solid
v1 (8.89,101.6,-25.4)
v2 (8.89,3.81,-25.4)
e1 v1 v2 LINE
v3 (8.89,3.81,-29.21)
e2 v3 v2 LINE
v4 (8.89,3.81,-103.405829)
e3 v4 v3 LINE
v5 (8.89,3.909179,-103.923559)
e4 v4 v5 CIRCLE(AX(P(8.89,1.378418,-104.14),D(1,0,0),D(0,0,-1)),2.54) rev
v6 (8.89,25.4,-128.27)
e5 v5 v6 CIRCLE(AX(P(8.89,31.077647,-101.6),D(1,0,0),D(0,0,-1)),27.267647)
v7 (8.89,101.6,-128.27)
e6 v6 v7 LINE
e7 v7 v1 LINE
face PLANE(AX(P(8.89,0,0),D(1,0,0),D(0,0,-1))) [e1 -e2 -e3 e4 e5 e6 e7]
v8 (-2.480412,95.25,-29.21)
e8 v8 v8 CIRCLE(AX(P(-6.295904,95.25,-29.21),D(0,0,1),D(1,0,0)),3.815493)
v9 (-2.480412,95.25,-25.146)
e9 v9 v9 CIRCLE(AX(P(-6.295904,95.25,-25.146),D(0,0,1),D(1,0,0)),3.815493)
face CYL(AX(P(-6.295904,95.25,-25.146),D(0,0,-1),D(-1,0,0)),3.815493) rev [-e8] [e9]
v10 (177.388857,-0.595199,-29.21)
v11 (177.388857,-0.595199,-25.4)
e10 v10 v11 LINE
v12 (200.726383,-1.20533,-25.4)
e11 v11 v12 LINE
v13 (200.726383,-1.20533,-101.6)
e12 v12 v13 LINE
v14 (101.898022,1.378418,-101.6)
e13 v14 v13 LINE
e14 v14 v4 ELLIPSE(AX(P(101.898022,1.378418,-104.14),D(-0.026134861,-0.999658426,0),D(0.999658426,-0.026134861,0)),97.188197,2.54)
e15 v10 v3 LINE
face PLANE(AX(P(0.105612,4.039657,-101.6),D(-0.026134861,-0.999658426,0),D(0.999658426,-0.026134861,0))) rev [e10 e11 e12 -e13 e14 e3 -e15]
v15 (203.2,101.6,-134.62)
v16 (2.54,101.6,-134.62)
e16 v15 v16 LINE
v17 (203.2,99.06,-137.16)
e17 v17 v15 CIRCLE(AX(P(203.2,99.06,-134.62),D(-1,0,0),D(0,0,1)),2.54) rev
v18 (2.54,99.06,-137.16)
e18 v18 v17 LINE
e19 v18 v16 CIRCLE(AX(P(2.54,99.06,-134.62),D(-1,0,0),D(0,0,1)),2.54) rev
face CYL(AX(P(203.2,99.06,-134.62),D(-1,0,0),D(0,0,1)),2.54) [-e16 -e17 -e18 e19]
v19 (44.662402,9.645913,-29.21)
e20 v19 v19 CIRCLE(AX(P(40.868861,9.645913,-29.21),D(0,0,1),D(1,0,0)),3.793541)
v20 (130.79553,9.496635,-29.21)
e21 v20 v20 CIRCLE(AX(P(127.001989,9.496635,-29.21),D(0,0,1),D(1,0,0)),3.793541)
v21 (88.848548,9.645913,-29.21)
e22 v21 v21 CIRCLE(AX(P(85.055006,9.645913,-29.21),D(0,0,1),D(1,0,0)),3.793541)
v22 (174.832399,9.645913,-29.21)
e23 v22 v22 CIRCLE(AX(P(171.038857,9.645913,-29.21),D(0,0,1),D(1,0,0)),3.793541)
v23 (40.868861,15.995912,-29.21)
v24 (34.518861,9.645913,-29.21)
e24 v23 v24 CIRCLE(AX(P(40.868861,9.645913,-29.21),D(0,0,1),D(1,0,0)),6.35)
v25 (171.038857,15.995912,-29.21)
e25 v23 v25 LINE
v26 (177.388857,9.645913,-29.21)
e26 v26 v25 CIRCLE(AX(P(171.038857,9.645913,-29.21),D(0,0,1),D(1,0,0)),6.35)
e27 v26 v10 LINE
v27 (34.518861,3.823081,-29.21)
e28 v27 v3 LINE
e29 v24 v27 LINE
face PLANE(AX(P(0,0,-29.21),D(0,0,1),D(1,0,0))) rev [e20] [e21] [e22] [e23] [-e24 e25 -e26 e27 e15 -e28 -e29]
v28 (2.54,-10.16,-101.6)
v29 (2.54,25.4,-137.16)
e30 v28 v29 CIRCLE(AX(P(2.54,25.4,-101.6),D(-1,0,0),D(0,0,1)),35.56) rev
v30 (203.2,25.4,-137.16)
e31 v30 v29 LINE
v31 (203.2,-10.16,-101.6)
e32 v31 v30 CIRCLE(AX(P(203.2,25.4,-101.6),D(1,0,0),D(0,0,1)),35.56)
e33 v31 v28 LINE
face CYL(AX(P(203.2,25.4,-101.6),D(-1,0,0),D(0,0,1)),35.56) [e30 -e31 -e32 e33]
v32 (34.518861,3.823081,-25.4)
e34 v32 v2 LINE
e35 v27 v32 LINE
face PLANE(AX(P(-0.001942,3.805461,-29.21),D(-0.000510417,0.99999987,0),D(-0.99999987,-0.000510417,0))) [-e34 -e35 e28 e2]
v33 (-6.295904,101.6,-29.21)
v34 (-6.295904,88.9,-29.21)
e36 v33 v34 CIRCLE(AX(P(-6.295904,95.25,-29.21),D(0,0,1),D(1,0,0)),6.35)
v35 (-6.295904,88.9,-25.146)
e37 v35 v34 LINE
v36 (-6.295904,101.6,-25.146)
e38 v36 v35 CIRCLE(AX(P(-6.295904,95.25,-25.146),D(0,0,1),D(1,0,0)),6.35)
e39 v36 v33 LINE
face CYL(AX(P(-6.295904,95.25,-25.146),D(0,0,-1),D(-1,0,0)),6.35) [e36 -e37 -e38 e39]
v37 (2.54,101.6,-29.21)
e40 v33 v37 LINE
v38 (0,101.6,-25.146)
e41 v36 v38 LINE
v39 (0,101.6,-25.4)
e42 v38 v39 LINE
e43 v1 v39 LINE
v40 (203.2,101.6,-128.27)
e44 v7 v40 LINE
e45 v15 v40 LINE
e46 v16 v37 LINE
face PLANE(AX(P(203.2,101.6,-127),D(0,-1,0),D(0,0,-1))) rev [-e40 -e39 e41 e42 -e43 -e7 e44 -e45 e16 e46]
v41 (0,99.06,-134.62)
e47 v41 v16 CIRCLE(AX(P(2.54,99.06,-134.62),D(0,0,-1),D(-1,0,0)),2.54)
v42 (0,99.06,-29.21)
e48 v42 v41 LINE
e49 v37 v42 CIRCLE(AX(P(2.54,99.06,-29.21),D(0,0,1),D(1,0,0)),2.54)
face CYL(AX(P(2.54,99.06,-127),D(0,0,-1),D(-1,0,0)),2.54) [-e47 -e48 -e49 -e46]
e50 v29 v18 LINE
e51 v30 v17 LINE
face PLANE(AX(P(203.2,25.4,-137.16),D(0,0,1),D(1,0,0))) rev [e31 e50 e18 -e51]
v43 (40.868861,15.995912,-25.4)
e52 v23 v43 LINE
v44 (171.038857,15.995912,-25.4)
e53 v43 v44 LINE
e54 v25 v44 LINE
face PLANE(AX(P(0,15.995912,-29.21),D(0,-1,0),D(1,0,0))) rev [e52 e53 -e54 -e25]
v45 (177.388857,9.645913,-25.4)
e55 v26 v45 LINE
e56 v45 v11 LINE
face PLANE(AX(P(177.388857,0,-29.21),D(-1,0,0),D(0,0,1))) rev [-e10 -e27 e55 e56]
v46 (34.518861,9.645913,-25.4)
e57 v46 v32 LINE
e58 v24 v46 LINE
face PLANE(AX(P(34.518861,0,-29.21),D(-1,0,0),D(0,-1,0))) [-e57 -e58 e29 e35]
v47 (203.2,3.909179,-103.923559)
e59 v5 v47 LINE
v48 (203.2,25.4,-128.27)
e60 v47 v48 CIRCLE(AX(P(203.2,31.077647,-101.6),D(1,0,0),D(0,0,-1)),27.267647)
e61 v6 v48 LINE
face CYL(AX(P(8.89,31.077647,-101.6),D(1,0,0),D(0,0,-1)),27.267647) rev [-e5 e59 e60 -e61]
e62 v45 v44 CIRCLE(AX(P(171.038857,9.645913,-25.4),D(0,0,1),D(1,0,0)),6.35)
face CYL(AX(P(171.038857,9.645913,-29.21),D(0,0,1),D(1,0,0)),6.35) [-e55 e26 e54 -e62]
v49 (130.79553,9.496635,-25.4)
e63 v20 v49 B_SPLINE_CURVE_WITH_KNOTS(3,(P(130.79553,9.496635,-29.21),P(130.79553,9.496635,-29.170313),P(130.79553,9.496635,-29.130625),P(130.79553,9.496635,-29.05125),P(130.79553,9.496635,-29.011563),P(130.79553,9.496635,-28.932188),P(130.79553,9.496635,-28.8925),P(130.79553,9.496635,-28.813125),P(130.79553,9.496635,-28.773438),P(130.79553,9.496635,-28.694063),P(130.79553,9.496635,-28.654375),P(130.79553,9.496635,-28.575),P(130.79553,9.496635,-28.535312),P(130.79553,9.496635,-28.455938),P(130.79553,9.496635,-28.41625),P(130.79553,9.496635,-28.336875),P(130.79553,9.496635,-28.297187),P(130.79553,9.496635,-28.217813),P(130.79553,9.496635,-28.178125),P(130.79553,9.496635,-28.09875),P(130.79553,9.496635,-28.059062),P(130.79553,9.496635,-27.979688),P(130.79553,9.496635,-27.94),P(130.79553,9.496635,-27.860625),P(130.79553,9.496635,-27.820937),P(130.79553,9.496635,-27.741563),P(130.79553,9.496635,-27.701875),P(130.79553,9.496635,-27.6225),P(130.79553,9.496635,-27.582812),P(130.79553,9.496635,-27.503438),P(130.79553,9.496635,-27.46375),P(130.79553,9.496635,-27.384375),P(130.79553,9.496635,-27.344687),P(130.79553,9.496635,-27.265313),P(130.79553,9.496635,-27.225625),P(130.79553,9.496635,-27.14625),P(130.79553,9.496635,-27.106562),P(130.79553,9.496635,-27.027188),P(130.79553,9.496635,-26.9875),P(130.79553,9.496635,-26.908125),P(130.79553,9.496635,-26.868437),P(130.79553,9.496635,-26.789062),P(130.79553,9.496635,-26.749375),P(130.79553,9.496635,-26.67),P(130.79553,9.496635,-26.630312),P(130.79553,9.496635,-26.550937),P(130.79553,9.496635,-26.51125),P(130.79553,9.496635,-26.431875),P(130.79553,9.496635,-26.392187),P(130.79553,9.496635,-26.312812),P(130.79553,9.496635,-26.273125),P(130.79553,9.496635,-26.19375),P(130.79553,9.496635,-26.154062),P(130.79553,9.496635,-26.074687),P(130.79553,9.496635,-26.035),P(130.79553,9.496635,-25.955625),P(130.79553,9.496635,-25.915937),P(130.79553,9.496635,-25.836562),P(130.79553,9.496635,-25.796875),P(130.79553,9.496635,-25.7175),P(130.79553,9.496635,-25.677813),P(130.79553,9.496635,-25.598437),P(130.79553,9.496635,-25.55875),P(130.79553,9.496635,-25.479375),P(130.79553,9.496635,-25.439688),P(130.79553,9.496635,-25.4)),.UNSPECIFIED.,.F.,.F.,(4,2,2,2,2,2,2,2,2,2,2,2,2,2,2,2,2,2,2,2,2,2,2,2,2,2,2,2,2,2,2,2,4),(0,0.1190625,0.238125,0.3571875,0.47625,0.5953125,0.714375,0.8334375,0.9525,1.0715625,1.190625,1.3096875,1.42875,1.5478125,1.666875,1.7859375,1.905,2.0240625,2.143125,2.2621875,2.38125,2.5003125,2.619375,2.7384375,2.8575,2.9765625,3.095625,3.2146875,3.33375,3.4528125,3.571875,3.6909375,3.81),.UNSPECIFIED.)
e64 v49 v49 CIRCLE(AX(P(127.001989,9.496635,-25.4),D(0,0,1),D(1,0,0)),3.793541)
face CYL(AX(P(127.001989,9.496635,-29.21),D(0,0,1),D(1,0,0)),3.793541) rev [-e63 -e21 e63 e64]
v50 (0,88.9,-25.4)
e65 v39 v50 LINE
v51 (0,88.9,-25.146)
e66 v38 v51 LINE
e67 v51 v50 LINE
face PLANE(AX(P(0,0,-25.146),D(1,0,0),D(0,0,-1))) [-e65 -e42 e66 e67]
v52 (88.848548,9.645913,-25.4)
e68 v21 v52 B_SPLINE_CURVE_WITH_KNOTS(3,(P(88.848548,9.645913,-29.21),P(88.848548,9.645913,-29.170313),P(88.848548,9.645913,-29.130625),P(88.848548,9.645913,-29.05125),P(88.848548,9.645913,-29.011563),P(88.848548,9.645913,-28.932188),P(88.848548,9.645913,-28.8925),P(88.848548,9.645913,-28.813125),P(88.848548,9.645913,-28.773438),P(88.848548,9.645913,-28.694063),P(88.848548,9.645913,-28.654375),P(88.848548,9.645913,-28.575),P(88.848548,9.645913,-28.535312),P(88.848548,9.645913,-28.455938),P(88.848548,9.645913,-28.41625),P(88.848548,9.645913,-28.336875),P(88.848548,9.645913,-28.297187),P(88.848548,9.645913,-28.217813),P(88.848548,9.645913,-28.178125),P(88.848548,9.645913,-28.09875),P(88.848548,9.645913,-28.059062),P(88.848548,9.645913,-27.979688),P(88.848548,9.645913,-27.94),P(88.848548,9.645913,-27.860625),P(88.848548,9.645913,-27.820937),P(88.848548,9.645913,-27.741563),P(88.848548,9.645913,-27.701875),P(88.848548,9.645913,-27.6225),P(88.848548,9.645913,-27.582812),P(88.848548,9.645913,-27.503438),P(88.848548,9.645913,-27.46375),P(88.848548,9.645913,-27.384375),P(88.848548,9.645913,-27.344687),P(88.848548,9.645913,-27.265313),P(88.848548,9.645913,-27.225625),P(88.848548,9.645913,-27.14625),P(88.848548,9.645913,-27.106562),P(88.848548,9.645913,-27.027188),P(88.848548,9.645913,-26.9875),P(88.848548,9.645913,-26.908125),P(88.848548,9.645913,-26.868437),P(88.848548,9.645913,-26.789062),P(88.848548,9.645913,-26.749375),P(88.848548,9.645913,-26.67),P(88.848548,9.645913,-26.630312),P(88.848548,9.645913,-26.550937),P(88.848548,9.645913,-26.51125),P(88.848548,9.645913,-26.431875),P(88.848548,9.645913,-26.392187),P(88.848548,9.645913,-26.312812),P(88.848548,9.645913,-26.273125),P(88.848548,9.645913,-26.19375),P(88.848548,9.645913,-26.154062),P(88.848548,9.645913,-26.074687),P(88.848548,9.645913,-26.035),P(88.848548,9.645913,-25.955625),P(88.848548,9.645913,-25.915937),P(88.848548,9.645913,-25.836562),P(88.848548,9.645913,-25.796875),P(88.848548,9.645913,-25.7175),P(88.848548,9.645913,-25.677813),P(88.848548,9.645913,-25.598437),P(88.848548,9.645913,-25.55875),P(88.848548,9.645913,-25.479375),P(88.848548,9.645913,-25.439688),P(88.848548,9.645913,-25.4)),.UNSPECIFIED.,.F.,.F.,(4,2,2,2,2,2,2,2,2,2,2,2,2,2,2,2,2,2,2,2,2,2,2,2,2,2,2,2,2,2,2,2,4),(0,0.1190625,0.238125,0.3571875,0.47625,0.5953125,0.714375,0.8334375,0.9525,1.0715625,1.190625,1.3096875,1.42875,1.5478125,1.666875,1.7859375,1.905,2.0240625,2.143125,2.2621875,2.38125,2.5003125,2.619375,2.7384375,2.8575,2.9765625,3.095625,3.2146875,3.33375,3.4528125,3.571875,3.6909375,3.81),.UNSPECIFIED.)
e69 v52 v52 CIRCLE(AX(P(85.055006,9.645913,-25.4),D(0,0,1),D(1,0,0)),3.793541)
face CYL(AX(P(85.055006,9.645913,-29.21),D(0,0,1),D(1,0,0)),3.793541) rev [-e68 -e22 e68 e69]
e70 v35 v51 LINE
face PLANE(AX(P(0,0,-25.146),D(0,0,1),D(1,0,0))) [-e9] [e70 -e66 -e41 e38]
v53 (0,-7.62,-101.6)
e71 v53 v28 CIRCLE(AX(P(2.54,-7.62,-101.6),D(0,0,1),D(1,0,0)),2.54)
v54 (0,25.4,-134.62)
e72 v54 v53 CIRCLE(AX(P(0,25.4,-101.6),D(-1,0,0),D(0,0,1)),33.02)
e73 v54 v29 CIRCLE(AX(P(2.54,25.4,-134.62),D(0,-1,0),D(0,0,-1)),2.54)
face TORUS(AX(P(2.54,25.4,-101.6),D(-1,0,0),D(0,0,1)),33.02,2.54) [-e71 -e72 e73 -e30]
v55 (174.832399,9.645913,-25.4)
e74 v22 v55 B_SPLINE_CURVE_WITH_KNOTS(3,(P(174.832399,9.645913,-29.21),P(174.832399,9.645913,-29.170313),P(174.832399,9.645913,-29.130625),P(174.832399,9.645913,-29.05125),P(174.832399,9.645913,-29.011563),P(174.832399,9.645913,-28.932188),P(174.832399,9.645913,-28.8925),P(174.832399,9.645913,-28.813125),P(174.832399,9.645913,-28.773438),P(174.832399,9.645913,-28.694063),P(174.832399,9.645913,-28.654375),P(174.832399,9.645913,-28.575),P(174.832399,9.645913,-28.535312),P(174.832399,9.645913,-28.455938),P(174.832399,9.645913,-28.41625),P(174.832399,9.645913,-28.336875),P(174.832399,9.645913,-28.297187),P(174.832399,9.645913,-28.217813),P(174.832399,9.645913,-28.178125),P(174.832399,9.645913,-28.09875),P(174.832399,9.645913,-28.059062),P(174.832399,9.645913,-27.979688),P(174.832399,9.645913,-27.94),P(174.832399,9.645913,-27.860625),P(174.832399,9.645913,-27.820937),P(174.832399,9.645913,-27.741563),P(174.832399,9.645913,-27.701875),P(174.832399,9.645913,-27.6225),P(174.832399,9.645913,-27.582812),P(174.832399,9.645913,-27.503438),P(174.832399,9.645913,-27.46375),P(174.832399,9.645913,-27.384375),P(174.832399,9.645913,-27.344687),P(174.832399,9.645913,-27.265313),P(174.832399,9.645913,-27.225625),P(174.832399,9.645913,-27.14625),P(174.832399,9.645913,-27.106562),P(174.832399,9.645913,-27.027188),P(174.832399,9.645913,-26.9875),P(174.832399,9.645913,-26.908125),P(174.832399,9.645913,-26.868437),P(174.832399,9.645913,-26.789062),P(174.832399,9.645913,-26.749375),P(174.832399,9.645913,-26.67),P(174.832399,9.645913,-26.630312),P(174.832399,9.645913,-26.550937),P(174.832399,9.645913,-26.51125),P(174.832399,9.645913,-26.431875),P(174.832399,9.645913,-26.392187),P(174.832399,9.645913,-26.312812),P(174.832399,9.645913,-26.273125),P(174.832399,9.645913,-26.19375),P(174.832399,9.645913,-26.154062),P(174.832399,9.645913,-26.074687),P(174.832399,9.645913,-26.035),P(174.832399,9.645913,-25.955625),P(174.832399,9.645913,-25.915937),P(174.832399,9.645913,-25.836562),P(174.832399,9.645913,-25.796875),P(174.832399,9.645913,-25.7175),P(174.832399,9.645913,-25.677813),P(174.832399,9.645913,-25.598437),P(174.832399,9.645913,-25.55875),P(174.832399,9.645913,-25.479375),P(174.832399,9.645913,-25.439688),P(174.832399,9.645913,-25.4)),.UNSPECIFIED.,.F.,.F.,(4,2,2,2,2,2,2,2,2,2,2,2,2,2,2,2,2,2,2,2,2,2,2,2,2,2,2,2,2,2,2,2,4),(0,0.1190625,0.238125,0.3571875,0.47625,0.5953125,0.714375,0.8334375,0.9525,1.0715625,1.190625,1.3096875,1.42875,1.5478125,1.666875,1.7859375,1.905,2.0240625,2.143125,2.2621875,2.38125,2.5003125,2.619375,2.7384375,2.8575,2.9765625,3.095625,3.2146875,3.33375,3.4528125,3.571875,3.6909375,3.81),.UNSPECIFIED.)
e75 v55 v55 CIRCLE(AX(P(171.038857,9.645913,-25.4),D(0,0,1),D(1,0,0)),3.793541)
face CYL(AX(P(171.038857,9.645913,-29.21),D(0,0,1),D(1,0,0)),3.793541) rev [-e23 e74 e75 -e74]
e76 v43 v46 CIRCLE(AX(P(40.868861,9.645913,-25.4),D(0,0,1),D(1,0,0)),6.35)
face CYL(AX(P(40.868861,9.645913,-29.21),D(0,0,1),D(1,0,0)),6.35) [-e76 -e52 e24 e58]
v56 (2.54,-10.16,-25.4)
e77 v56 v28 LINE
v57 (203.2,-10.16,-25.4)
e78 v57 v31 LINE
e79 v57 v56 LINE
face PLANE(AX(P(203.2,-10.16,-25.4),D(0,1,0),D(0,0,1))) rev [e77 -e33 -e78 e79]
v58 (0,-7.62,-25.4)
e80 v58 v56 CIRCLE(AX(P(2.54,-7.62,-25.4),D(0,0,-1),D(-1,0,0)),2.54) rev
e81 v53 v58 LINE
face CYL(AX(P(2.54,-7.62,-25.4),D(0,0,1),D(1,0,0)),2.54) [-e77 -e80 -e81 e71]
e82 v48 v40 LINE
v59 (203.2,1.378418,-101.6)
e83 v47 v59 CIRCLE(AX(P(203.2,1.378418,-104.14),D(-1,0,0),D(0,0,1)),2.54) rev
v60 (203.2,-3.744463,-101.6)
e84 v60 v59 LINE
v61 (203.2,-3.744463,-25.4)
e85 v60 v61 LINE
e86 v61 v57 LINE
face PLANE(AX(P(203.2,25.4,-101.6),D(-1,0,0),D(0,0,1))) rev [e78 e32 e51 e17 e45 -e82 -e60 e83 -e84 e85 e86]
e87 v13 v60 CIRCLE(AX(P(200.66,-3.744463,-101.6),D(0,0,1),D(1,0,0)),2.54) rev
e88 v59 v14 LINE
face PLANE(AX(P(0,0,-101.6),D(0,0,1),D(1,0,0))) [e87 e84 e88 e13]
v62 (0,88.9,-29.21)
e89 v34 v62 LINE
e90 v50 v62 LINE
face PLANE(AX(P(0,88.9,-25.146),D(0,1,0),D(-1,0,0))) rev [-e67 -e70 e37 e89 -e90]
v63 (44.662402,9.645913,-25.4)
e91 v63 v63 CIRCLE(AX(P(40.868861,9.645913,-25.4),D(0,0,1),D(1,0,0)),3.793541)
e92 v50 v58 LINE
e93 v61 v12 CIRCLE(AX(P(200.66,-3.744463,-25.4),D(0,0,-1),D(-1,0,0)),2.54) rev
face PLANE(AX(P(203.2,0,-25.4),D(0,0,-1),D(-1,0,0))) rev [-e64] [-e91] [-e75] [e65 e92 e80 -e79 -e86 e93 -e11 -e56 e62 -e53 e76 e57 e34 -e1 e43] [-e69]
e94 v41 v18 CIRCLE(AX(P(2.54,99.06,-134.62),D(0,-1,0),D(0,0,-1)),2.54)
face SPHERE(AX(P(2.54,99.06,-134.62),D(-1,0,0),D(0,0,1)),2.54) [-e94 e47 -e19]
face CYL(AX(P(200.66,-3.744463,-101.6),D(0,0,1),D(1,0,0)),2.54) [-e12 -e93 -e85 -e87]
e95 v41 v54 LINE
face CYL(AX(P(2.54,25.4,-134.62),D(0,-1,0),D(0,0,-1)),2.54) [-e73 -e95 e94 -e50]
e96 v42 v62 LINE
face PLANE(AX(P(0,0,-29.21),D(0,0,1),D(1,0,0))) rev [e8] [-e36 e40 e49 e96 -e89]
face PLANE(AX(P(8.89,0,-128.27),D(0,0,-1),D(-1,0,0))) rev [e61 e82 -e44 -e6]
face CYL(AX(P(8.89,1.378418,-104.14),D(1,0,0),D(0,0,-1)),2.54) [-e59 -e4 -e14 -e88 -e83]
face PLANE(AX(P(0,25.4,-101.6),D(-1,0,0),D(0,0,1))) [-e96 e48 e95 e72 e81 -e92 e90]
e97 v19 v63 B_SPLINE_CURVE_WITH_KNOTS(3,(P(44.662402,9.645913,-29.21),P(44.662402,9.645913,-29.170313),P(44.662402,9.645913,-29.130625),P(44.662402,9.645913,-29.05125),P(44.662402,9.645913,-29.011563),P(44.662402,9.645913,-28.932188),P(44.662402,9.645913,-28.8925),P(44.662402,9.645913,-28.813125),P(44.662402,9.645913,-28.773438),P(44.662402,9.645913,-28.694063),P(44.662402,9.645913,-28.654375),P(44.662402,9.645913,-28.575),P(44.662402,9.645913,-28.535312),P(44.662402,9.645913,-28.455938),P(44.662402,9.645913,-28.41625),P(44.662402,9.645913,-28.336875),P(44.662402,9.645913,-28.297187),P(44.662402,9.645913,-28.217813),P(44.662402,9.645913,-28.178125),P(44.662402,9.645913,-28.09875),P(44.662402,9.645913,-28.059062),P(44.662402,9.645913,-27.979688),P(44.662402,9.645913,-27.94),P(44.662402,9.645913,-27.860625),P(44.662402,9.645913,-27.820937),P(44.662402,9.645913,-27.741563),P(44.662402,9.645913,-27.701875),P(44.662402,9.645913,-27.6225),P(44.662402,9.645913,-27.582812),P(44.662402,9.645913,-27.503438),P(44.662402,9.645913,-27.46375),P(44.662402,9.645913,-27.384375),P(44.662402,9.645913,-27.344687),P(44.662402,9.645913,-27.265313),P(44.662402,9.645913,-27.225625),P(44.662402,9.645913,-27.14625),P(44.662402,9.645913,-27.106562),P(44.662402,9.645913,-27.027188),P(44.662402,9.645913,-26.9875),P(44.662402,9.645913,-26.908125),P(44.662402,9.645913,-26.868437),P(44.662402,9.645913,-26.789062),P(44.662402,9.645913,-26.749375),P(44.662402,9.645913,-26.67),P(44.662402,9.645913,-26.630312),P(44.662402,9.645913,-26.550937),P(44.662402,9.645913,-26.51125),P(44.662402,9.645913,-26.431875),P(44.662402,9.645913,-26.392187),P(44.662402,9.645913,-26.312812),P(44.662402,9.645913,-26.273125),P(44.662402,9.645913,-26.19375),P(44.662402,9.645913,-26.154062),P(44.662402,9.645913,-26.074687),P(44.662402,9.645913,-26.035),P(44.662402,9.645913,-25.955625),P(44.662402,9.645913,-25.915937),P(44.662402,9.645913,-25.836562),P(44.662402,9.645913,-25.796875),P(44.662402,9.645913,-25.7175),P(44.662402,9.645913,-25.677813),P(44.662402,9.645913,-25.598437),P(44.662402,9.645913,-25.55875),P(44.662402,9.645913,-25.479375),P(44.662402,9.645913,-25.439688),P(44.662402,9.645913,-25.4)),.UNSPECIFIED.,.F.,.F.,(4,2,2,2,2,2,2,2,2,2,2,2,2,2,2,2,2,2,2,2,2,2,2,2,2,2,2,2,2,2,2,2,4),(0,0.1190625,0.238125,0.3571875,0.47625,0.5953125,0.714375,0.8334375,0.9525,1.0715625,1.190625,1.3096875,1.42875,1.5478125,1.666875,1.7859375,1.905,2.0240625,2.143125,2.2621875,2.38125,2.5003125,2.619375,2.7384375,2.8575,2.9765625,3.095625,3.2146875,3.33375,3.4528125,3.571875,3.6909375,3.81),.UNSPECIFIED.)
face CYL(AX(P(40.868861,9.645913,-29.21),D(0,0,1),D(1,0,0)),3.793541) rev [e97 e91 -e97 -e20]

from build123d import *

# Parameters (mm, degrees)
BOSS_EXTRUDE1_DEPTH      = 203.2
CUT_EXTRUDE1_DEPTH       = 194.31
CUT_EXTRUDE2_DEPTH       = 76.2
FILLET1_R                = 2.54
SKETCH8_R                = 3.793541353
BOSS_EXTRUDE2_DEPTH      = 3.81
BOSS_EXTRUDE3_DEPTH      = 0.254
BOSS_EXTRUDE3_DEPTH_BACK = 3.81
SKETCH9_R                = 3.815492591
FILLET2_R                = 2.54
FILLET4_R                = 2.54
FILLET5_R                = 2.54


with BuildPart() as part:
    # Sketch1 → Boss-Extrude1 (new body)
    with BuildSketch(Plane(origin=(0, 0, 0), x_dir=(0, 0, -1), z_dir=(1, 0, 0))):
        with BuildLine():
            Line((25.4, 0), (25.4, -10.16))
            Line((25.4, -10.16), (101.6, -10.16))
            ThreePointArc((101.6, -10.16), (126.744717139, 0.255282861), (137.16, 25.4))
            Line((137.16, 25.4), (137.16, 101.6))
            Line((137.16, 101.6), (127, 101.6))
            Line((127, 101.6), (25.4, 101.6))
            Line((25.4, 101.6), (25.4, 0))
        make_face()
    extrude(amount=BOSS_EXTRUDE1_DEPTH)

    # Sketch4 → Cut-Extrude1 (cut)
    with BuildSketch(Plane(origin=(203.2, 0, 0), x_dir=(0, 0, -1), z_dir=(1, 0, 0))):
        with BuildLine():
            Line((25.4, 3.81), (101.6, 3.81))
            ThreePointArc((101.6, 3.81), (118.756755229, 9.884008246), (128.27, 25.4))
            Line((128.27, 25.4), (128.27, 101.6))
            Line((128.27, 101.6), (25.4, 101.6))
            Line((25.4, 101.6), (25.4, 3.81))
        make_face()
    extrude(amount=-CUT_EXTRUDE1_DEPTH, mode=Mode.SUBTRACT)

    # Sketch5 → Cut-Extrude2 (cut)
    with BuildSketch(Plane.XY.offset(-25.4)):
        Polygon((203.2, 3.81), (8.89, 3.81), (203.2, -1.27), align=None)
    extrude(amount=-CUT_EXTRUDE2_DEPTH, mode=Mode.SUBTRACT)

    # Fillet1
    # the kernel refuses this fillet: 2.54 mm, written as the material it takes off along each edge
    with BuildSketch(Plane(origin=(209.278955694, 3.81, -101.6), x_dir=(0, -1, 0), z_dir=(-1, 0, 0))) as fillet1_piece_1_section:
        with BuildLine():
            CenterArc((2.431582278, -2.54), FILLET1_R, 90, 85.111724817)
            ThreePointArc((-0.099179119, -2.323558897), (-0.024806063, -1.162837311), (0, 0))
            Line((0, 0), (2.431582278, 0))
        make_face()
    fillet1_piece_1 = extrude(amount=200.388955694, mode=Mode.PRIVATE)
    fillet1_piece_1 = split(fillet1_piece_1, bisect_by=Plane(origin=(118.388821379, 0.947285716, -102.156943798), z_dir=(0.02613486081539205, 0.9996584261887458, 0)), keep=Keep.TOP, mode=Mode.PRIVATE)
    add(fillet1_piece_1, mode=Mode.SUBTRACT)

    # Sketch8 → Boss-Extrude2 (add)
    with BuildSketch(Plane.XY.offset(-25.4)):
        with BuildLine():
            Line((34.518861263, 3.823081405), (8.89, 3.81))
            Line((8.89, 3.81), (177.388856757, -0.595198869))
            Line((177.388856757, -0.595198869), (177.388856757, 9.645912611))
            ThreePointArc((177.388856757, 9.645912611), (175.528984934, 14.136040391), (171.038857154, 15.995912214))
            Line((171.038857154, 15.995912214), (40.868860866, 15.995912214))
            ThreePointArc((40.868860866, 15.995912214), (36.378733086, 14.136040391), (34.518861263, 9.645912611))
            Line((34.518861263, 9.645912611), (34.518861263, 3.823081405))
        make_face()
        with Locations((127.001989144, 9.496635092)):
            Circle(SKETCH8_R, mode=Mode.SUBTRACT)
        with Locations((171.038857154, 9.645912611)):
            Circle(SKETCH8_R, mode=Mode.SUBTRACT)
        with Locations((40.868860866, 9.645912611)):
            Circle(SKETCH8_R, mode=Mode.SUBTRACT)
        with Locations((85.055006395, 9.645912611)):
            Circle(SKETCH8_R, mode=Mode.SUBTRACT)
    extrude(amount=-BOSS_EXTRUDE2_DEPTH)

    # Sketch9 → Boss-Extrude3 (add, two sides: drawn at the far end of the back side and taken through both)
    with BuildSketch(Plane.XY.offset(-25.4).offset(-BOSS_EXTRUDE3_DEPTH_BACK)):
        with BuildLine():
            Line((0, 96.077095974), (0, 101.6))
            Line((0, 101.6), (-6.295904403, 101.6))
            ThreePointArc((-6.295904403, 101.6), (-12.645904403, 95.25), (-6.295904403, 88.9))
            Line((-6.295904403, 88.9), (0, 88.9))
            Line((0, 88.9), (0, 94.422904026))
            Line((0, 94.422904026), (0, 96.077095974))
        make_face()
        with Locations((-6.295904403, 95.25)):
            Circle(SKETCH9_R, mode=Mode.SUBTRACT)
    extrude(amount=BOSS_EXTRUDE3_DEPTH + BOSS_EXTRUDE3_DEPTH_BACK)

    # Fillet2
    fillet2_edges = [part.edges().sort_by_distance(p)[0] for p in [
        (101.6, 101.6, -137.16),
    ]]
    fillet(fillet2_edges, radius=FILLET2_R)

    # Fillet4
    fillet4_edges = [part.edges().sort_by_distance(p)[0] for p in [
        (203.2, -1.27, -63.5),
    ]]
    fillet(fillet4_edges, radius=FILLET4_R)

    # Fillet5
    fillet5_edges = [part.edges().sort_by_distance(p)[0] for p in [
        (0, 101.6, -81.915),
        (0, 100.856051224, -136.416051224),
        (0, 62.23, -137.16),
        (0, 0.255282861, -126.744717139),
        (0, -10.16, -63.5),
    ]]
    fillet(fillet5_edges, radius=FILLET5_R)


solid = part.part
